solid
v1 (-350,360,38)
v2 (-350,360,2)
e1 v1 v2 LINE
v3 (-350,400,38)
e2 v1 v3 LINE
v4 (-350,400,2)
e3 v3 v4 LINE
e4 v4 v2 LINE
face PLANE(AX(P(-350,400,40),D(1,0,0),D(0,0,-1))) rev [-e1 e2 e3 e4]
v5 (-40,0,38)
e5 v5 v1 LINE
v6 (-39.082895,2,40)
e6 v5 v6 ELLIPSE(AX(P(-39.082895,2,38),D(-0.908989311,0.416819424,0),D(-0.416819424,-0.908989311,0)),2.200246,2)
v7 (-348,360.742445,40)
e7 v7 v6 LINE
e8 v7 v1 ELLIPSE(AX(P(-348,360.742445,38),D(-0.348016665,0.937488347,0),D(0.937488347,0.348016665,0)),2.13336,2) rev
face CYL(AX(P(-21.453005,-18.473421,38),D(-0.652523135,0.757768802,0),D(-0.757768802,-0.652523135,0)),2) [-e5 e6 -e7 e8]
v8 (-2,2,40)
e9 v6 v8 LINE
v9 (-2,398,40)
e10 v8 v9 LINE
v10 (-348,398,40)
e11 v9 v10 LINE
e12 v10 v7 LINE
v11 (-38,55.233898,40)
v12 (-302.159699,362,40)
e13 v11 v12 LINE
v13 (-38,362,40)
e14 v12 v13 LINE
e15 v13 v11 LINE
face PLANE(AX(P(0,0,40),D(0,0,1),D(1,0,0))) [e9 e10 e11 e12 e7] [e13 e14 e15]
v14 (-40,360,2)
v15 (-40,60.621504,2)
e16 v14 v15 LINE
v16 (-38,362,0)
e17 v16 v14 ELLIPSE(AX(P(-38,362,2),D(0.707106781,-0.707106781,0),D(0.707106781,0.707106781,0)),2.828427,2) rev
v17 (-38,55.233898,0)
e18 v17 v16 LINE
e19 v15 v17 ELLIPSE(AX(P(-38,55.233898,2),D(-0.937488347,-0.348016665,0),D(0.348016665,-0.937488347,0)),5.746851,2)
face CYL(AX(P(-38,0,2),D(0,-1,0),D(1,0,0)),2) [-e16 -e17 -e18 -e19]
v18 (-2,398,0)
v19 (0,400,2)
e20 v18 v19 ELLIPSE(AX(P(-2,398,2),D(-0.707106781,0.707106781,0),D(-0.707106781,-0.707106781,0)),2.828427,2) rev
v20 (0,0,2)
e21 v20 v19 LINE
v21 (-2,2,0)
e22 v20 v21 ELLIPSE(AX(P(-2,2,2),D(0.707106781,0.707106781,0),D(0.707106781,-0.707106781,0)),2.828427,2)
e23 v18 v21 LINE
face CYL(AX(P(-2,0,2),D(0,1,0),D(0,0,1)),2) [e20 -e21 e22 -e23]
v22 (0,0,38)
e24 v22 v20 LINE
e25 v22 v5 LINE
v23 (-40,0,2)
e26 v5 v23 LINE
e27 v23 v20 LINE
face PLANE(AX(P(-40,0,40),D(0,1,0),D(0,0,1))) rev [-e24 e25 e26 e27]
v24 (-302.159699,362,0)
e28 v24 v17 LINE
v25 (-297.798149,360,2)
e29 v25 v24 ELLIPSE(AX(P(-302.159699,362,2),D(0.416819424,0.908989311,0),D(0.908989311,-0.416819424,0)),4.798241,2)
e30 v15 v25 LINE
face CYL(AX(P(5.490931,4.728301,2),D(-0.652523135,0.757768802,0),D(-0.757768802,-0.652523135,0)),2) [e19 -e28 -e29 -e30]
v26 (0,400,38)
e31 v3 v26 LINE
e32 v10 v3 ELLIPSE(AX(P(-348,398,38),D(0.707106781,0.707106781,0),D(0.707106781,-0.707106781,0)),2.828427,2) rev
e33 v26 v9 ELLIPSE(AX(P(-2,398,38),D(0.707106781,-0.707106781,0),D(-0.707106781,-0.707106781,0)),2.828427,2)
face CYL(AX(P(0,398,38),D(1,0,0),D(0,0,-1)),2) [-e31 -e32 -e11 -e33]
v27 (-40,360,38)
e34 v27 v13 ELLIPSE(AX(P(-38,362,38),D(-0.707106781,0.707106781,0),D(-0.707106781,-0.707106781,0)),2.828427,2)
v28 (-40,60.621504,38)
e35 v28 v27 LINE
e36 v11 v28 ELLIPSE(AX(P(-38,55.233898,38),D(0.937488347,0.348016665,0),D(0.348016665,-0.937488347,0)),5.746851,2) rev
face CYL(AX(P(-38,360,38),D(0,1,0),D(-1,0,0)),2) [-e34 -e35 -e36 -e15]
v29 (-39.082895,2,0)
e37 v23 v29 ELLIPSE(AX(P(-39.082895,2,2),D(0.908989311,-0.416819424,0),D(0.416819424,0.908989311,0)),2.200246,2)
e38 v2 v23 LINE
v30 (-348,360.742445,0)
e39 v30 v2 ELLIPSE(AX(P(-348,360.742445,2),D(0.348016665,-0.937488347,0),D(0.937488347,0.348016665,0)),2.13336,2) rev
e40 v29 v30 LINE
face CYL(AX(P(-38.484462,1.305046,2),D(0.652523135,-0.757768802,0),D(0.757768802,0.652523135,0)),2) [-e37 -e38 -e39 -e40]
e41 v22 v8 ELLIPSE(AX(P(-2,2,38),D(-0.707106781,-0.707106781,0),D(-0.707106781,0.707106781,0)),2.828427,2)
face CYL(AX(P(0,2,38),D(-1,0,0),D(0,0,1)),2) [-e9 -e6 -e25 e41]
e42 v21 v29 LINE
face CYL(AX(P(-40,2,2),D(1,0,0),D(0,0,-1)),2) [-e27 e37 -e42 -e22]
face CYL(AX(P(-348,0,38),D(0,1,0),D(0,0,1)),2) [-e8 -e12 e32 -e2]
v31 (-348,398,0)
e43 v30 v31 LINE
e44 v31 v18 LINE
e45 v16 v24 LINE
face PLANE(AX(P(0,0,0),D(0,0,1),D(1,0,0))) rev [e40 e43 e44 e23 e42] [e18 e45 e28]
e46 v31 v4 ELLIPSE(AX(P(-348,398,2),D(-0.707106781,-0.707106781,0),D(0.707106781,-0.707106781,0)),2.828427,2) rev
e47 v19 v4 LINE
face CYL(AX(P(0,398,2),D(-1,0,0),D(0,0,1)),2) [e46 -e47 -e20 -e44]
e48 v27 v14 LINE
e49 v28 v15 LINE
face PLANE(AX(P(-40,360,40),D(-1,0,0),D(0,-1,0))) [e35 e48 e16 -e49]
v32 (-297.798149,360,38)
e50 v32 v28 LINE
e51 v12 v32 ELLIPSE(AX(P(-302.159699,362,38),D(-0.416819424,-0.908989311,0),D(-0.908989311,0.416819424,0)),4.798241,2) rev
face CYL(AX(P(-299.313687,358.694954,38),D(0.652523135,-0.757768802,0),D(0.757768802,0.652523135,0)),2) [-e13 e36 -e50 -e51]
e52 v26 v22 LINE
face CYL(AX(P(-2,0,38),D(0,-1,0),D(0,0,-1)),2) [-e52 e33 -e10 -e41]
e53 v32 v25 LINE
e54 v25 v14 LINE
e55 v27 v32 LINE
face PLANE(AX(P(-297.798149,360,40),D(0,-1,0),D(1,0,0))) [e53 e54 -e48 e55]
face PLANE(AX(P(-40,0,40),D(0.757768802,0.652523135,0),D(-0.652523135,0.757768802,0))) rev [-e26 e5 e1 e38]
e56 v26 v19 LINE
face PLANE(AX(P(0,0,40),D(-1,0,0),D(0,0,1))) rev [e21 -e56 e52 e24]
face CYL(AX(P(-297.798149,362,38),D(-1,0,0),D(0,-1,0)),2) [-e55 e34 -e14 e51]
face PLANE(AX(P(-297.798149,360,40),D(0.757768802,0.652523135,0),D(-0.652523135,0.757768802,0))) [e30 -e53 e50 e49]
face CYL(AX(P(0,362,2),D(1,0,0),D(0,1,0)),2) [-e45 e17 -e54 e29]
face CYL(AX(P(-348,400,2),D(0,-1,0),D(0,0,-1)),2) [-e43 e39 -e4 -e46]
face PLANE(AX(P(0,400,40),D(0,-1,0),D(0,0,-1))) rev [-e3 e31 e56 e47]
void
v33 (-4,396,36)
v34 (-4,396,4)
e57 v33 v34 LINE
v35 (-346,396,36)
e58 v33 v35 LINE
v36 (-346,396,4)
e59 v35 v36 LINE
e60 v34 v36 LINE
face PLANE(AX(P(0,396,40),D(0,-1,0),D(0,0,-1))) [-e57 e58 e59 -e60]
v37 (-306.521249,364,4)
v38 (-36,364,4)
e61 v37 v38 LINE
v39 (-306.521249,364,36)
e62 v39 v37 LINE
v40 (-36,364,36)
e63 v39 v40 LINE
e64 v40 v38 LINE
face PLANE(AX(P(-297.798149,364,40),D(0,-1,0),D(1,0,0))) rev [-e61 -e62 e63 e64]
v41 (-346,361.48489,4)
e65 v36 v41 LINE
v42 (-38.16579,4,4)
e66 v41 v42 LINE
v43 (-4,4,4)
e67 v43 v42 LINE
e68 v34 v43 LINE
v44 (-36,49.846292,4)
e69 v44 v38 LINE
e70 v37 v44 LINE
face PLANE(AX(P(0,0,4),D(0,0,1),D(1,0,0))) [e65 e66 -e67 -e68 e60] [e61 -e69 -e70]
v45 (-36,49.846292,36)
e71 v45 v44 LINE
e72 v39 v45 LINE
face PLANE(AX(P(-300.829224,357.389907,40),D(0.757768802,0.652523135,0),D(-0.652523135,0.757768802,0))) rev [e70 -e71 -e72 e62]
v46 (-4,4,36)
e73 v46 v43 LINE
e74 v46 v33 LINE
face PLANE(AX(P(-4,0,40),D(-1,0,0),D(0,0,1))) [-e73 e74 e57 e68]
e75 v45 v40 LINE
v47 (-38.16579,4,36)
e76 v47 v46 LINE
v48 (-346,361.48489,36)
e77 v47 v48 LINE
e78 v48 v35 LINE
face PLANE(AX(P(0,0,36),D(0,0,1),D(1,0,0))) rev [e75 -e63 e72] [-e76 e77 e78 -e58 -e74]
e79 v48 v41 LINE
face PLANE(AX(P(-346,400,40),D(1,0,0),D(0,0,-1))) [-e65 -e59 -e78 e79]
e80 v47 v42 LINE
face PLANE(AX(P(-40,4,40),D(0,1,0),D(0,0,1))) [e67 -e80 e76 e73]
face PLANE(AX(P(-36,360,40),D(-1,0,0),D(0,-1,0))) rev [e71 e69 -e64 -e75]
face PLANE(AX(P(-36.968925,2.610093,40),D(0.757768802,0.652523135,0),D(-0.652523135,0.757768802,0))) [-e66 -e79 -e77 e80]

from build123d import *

# Parameters (mm, degrees)
BOSS_EXTRU_1_DEPTH = 40
CONG_1_R           = 2
COQUE1_START       = 4
COQUE1_DEPTH       = 32


# Read off the part's stored shape, not the designer's step: Coque1
with BuildPart() as part:
    # Esquisse1 → Boss.-Extru.1 (new body)
    with BuildSketch(Plane.XY):
        Polygon((0, 0), (0, 400), (-350, 400), (-350, 360), (-40, 0), align=None)
        Polygon((-297.798149171, 360), (-40, 360), (-40, 60.621504188), align=None, mode=Mode.SUBTRACT)
    extrude(amount=BOSS_EXTRU_1_DEPTH)

    # Congé1
    cong_1_edges = [part.edges().sort_by_distance(p)[0] for p in [
        (-175, 400, 40),
        (-350, 380, 40),
        (-195, 180, 40),
        (-168.899074586, 210.310752094, 0),
        (-40, 210.310752094, 0),
        (-168.899074586, 360, 0),
        (-168.899074586, 210.310752094, 40),
        (-40, 210.310752094, 40),
        (-168.899074586, 360, 40),
        (-20, 0, 40),
        (-195, 180, 0),
        (-350, 380, 0),
        (-175, 400, 0),
        (0, 200, 0),
        (-20, 0, 0),
        (0, 200, 40),
    ]]
    fillet(cong_1_edges, radius=CONG_1_R)

    # Coque1 outline → Coque1 (cut)
    with BuildSketch(Plane.XY.offset(COQUE1_START)):
        Polygon((-38.165789547, 4), (-4, 4), (-4, 396), (-346, 396), (-346, 361.484889559), align=None)
        Polygon((-36, 364), (-36, 49.846292049), (-306.521248514, 364), align=None, mode=Mode.SUBTRACT)
    extrude(amount=COQUE1_DEPTH, mode=Mode.SUBTRACT)


solid = part.part
